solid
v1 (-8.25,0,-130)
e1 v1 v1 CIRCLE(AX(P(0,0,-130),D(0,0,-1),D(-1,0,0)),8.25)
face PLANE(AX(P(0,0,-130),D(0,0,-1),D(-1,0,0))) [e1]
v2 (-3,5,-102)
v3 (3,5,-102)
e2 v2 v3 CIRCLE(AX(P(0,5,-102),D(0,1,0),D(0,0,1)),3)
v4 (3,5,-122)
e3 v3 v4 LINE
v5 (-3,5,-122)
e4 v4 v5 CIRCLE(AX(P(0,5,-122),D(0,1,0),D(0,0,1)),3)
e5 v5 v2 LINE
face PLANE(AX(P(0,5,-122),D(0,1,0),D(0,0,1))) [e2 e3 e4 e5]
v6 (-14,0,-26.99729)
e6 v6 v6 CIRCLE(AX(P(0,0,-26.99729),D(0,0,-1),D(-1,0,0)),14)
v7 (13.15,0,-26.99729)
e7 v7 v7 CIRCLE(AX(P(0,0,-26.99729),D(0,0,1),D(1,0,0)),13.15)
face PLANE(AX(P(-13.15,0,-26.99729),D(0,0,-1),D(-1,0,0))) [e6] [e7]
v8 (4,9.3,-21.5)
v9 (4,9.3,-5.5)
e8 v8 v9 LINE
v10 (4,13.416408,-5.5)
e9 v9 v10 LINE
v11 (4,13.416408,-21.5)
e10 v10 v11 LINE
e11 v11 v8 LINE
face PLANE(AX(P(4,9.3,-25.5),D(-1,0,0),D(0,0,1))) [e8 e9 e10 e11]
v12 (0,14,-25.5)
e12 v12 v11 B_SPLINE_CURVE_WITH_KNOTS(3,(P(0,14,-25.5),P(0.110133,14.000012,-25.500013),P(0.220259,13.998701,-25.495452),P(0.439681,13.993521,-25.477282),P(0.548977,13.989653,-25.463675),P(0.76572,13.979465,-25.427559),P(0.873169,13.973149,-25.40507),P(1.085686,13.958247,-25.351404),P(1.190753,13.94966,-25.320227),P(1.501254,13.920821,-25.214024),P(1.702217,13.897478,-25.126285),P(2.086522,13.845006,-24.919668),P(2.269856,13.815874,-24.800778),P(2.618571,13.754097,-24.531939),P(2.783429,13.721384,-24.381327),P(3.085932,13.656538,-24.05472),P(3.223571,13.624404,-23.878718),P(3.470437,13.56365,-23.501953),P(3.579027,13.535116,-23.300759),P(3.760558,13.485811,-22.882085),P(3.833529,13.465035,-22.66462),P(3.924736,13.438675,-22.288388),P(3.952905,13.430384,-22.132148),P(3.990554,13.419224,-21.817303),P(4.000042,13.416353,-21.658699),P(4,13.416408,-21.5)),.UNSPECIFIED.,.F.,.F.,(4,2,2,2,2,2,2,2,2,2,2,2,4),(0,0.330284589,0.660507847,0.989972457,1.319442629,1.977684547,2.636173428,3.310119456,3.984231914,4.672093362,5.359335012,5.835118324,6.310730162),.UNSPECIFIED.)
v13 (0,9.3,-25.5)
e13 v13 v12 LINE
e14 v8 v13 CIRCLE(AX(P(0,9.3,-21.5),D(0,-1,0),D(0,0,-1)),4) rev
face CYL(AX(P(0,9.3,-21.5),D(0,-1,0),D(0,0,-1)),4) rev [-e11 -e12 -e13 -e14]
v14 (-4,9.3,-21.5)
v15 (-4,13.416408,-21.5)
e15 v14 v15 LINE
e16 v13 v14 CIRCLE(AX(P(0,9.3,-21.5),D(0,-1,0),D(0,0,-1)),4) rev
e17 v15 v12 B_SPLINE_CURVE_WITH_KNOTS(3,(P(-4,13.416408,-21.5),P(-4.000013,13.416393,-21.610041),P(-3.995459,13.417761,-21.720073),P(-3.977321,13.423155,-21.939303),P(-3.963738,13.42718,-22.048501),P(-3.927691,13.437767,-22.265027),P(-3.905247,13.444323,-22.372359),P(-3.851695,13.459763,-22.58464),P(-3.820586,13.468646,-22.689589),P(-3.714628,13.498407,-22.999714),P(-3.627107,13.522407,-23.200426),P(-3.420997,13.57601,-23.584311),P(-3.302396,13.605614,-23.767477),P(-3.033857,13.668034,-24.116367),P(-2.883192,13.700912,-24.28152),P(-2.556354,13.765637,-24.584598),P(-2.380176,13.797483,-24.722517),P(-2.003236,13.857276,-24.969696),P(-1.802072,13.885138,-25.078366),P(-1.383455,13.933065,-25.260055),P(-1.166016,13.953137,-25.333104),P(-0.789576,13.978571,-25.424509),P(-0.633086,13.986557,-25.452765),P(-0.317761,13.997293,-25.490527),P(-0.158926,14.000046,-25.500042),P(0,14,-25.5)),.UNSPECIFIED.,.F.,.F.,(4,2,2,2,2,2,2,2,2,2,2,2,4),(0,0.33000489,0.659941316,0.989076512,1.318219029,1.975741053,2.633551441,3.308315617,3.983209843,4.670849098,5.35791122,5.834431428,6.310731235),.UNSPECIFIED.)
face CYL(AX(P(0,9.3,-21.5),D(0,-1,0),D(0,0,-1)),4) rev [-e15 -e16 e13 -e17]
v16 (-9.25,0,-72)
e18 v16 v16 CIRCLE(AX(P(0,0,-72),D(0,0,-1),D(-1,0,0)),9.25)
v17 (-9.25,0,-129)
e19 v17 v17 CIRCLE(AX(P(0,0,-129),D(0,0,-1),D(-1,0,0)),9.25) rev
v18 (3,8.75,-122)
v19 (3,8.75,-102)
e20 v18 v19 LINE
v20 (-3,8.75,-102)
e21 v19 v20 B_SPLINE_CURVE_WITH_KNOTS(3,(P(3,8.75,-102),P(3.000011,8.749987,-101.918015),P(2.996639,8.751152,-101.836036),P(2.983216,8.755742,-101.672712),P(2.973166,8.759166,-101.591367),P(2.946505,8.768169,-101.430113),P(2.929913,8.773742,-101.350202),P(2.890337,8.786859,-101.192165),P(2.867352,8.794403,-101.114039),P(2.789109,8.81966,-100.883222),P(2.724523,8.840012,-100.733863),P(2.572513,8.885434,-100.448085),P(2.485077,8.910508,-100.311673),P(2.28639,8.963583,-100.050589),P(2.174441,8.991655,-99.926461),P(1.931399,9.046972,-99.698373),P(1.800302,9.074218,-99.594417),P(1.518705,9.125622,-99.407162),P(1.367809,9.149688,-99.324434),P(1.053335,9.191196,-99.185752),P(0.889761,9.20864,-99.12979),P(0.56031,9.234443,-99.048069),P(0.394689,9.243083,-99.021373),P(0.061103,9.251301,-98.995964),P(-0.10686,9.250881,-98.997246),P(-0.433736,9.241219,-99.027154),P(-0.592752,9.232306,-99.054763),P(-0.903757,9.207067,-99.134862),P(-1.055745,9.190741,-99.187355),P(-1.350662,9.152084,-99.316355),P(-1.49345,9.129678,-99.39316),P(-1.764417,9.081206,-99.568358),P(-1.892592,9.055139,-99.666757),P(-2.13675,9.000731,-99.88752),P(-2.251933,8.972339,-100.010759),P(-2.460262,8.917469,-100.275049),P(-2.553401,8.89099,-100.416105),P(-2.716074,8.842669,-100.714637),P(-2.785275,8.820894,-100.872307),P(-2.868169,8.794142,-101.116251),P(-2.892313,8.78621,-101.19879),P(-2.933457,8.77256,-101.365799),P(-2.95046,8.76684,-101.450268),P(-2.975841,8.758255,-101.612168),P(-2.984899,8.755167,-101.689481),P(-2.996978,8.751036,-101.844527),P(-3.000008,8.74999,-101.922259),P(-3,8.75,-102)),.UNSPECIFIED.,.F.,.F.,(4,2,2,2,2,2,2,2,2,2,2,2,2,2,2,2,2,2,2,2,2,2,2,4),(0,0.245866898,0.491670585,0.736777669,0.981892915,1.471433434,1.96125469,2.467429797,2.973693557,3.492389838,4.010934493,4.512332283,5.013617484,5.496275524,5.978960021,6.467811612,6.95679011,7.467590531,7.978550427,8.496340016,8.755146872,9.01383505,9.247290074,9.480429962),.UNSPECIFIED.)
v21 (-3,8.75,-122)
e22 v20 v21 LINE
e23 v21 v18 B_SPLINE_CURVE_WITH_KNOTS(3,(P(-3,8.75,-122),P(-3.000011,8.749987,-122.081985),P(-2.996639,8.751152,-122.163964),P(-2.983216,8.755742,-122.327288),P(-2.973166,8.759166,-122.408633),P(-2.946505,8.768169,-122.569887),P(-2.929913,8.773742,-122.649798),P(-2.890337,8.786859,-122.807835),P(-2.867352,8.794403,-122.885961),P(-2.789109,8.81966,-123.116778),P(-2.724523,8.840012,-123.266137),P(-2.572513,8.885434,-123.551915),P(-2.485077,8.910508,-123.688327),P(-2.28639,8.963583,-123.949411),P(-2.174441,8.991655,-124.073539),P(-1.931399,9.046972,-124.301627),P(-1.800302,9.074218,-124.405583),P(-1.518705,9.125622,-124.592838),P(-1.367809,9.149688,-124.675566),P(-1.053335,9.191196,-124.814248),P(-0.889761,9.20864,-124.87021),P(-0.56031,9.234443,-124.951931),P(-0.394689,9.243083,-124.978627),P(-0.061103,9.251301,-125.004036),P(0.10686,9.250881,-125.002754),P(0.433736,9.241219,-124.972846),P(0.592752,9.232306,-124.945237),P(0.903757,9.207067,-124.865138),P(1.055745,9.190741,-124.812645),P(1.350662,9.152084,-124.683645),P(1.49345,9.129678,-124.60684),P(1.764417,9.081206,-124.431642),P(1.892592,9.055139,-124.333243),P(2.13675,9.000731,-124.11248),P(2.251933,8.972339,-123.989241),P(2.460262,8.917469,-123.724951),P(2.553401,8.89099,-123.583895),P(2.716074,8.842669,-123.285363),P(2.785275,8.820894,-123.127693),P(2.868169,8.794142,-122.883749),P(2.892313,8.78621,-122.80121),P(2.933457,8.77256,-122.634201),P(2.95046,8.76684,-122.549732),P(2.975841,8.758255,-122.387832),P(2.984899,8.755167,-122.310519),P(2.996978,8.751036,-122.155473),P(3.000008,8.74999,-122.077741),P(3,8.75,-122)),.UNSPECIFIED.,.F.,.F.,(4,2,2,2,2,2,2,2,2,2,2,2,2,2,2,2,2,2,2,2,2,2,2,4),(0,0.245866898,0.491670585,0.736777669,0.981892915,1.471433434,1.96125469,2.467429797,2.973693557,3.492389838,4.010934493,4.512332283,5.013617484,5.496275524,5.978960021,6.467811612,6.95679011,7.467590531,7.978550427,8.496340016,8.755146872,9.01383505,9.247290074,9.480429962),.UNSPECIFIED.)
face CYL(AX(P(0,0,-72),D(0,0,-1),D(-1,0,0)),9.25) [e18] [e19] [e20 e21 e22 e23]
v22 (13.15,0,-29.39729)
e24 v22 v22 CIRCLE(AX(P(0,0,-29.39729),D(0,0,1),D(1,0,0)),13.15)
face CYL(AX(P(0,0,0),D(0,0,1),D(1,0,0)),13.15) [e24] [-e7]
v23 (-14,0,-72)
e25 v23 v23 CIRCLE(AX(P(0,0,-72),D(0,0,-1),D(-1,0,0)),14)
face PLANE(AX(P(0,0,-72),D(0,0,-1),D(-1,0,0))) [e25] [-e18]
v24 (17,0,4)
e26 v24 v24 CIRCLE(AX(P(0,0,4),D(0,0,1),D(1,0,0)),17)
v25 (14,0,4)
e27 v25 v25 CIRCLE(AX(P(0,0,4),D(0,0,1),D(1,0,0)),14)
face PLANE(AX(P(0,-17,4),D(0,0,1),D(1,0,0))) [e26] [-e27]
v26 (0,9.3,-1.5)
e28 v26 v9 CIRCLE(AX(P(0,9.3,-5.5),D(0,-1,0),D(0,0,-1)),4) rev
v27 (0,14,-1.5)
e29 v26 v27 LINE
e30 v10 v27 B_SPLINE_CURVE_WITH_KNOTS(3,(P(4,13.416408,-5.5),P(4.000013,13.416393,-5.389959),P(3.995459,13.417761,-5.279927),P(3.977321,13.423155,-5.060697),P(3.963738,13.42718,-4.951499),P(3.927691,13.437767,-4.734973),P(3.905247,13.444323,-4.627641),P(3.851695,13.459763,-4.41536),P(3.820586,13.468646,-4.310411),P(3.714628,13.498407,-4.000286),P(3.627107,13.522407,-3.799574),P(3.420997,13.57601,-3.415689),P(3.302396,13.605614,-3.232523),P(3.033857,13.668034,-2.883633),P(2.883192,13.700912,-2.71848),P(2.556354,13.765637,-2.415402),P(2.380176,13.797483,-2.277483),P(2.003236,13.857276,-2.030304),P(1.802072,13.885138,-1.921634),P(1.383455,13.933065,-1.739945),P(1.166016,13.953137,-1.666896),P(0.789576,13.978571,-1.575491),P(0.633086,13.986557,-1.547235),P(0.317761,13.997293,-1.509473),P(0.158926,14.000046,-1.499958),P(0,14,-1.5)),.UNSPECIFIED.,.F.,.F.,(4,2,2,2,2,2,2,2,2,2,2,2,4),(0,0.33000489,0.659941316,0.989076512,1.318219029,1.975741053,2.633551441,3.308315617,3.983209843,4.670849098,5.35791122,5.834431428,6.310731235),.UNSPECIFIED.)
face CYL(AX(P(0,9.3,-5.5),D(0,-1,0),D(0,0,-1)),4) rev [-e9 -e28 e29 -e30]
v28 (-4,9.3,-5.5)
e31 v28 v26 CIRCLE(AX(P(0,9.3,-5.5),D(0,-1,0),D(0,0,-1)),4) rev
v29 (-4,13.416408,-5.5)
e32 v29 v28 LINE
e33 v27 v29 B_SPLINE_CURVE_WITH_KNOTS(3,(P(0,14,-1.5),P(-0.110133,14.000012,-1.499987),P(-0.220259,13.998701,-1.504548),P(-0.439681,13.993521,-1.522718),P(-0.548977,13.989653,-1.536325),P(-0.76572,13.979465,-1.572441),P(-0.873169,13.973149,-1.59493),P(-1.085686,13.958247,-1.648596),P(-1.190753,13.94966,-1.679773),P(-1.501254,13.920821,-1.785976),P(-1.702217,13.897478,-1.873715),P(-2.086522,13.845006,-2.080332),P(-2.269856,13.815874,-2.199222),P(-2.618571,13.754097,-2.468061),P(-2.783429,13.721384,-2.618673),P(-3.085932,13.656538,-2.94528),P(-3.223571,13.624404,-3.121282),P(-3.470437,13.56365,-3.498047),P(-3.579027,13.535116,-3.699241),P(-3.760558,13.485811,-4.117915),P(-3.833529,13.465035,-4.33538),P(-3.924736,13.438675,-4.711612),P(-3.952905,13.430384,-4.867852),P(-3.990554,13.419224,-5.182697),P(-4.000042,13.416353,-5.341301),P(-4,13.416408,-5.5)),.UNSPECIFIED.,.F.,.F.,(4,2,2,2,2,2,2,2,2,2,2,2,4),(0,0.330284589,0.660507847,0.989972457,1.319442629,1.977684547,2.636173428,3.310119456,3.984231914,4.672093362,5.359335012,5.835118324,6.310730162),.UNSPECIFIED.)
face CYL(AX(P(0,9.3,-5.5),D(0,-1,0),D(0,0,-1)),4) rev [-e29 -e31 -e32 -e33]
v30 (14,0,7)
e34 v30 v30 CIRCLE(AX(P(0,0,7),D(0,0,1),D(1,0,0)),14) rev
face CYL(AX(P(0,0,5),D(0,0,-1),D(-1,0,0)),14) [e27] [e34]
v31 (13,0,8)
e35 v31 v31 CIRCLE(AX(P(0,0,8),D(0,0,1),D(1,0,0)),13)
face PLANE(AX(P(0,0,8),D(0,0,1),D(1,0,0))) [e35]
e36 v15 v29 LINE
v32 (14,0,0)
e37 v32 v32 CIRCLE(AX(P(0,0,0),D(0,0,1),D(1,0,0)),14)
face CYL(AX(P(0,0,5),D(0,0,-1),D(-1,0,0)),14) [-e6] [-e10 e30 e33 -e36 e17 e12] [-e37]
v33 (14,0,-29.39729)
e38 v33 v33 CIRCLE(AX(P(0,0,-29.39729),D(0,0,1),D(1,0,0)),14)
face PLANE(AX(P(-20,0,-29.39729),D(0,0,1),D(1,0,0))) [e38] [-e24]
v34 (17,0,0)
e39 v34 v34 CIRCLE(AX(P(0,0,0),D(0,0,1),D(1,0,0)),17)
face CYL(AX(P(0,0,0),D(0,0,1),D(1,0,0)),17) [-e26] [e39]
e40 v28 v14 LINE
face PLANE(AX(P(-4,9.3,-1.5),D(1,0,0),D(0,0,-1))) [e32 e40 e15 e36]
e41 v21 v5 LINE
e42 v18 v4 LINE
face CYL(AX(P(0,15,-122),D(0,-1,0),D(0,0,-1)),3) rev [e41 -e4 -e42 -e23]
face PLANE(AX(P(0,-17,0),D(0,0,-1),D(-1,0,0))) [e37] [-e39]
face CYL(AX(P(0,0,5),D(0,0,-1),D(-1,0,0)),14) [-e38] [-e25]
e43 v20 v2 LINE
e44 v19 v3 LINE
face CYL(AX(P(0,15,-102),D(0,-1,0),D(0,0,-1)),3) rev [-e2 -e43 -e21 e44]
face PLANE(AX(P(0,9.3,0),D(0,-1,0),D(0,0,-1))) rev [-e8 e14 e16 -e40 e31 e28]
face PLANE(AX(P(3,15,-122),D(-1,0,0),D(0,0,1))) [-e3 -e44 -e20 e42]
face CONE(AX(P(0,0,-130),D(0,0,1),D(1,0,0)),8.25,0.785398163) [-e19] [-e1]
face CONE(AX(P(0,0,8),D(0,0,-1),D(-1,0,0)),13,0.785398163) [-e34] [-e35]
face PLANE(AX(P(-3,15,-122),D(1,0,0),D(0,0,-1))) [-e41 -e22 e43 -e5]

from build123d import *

# Parameters (mm, degrees)
BOSS_EXTRUDE1_DEPTH      = 5
BOSS_EXTRUDE1_DEPTH_BACK = 100
SKETCH1_R                = 14
SKETCH2_W                = 8
SKETCH2_H                = 24
CUT_EXTRUDE1_DEPTH       = 8
SKETCH3_R                = 14
BOSS_EXTRUDE2_DEPTH      = 8
FILLET1_R                = 4
SKETCH4_W                = 4
SKETCH4_H                = 3
SKETCH7_W                = 6.85
SKETCH7_H                = 2.4
CUT_EXTRUDE2_START       = -5
SKETCH8_R                = 14
CUT_EXTRUDE2_DEPTH       = 5
SKETCH9_R                = 21.936925755
SKETCH9_R_2              = 9.25
CUT_EXTRUDE3_DEPTH       = 28
BOSS_EXTRUDE3_START      = 30
SKETCH10_R               = 9.25
BOSS_EXTRUDE3_DEPTH      = 30
CHAMFER1_SIZE            = 1
CUT_EXTRUDE4_START       = 5
CUT_EXTRUDE4_DEPTH       = 10


with BuildPart() as part:
    # Sketch1 → Boss-Extrude1 (new, two sides: drawn at the far end of the back side and taken through both)
    with BuildSketch(Plane.XY.offset(-BOSS_EXTRUDE1_DEPTH_BACK)):
        Circle(SKETCH1_R)
    extrude(amount=BOSS_EXTRUDE1_DEPTH + BOSS_EXTRUDE1_DEPTH_BACK)

    # Sketch2 → Cut-Extrude1 (cut)
    with BuildSketch(Plane.XZ.offset(-17.3)):
        with Locations((0, -13.5)):
            Rectangle(SKETCH2_W, SKETCH2_H)
    extrude(amount=CUT_EXTRUDE1_DEPTH, mode=Mode.SUBTRACT)

    # Sketch3 → Boss-Extrude2 (add)
    with BuildSketch(Plane.XY.offset(5)):
        Circle(SKETCH3_R)
    extrude(amount=BOSS_EXTRUDE2_DEPTH)

    # Fillet1
    fillet1_edges = [part.edges().sort_by_distance(p)[0] for p in [
        (-4, 11.358203932, -25.5),
        (4, 11.358203932, -25.5),
        (4, 11.358203932, -1.5),
        (-4, 11.358203932, -1.5),
    ]]
    fillet(fillet1_edges, radius=FILLET1_R - 0.0001)  # a hair under: the kernel refuses the full size

    # Sketch4 → Revolve1 (revolve)
    with BuildSketch(Plane(origin=(0, 0, 0), x_dir=(0, 0, -1), z_dir=(1, 0, 0)), mode=Mode.PRIVATE) as revolve1_sk:
        with Locations((-2, -15.5)):
            Rectangle(SKETCH4_W, SKETCH4_H)
    revolve(revolve1_sk.sketch.rotate(Axis((0, 0, 0), (0, 0, -1)), 270), axis=Axis((0, 0, 0), (0, 0, -1)))

    # Sketch7 → Cut-Revolve2 (revolve, cut)
    with BuildSketch(Plane(origin=(0, 0, 0), x_dir=(1, 0, 0), z_dir=(0, 1, 0)), mode=Mode.PRIVATE) as cut_revolve2_sk:
        with Locations((-16.575, 28.197290459)):
            Rectangle(SKETCH7_W, SKETCH7_H)
    revolve(cut_revolve2_sk.sketch.rotate(Axis((0, 0, 5), (0, 0, -1)), 180), axis=Axis((0, 0, 5), (0, 0, -1)), mode=Mode.SUBTRACT)

    # Sketch8 → Cut-Extrude2 (cut)
    with BuildSketch(Plane.XY.offset(13).offset(CUT_EXTRUDE2_START)):
        Circle(SKETCH8_R)
    extrude(amount=CUT_EXTRUDE2_DEPTH, mode=Mode.SUBTRACT)

    # Sketch9 → Cut-Extrude3 (cut)
    with BuildSketch(Plane(origin=(0, 0, -100), x_dir=(-1, 0, 0), z_dir=(0, 0, -1))):
        Circle(SKETCH9_R)
        Circle(SKETCH9_R_2, mode=Mode.SUBTRACT)
    extrude(amount=-CUT_EXTRUDE3_DEPTH, mode=Mode.SUBTRACT)

    # Sketch10 → Boss-Extrude3 (add)
    with BuildSketch(Plane(origin=(0, 0, -100), x_dir=(-1, 0, 0), z_dir=(0, 0, -1)).offset(BOSS_EXTRUDE3_START)):
        Circle(SKETCH10_R)
    extrude(amount=-BOSS_EXTRUDE3_DEPTH)

    # Chamfer1
    chamfer1_edges = [part.edges().sort_by_distance(p)[0] for p in [
        (9.25, 0, -130),
        (-14, 0, 8),
    ]]
    chamfer(chamfer1_edges, length=CHAMFER1_SIZE)

    # Sketch15 → Cut-Extrude4 (cut)
    with BuildSketch(Plane(origin=(0, 0, 0), x_dir=(1, 0, 0), z_dir=(0, 1, 0)).offset(CUT_EXTRUDE4_START)):
        with BuildLine():
            Line((3, 122), (3, 102))
            ThreePointArc((3, 102), (0, 99), (-3, 102))
            Line((-3, 102), (-3, 122))
            ThreePointArc((-3, 122), (0, 125), (3, 122))
        make_face()
    extrude(amount=CUT_EXTRUDE4_DEPTH, mode=Mode.SUBTRACT)


solid = part.part
